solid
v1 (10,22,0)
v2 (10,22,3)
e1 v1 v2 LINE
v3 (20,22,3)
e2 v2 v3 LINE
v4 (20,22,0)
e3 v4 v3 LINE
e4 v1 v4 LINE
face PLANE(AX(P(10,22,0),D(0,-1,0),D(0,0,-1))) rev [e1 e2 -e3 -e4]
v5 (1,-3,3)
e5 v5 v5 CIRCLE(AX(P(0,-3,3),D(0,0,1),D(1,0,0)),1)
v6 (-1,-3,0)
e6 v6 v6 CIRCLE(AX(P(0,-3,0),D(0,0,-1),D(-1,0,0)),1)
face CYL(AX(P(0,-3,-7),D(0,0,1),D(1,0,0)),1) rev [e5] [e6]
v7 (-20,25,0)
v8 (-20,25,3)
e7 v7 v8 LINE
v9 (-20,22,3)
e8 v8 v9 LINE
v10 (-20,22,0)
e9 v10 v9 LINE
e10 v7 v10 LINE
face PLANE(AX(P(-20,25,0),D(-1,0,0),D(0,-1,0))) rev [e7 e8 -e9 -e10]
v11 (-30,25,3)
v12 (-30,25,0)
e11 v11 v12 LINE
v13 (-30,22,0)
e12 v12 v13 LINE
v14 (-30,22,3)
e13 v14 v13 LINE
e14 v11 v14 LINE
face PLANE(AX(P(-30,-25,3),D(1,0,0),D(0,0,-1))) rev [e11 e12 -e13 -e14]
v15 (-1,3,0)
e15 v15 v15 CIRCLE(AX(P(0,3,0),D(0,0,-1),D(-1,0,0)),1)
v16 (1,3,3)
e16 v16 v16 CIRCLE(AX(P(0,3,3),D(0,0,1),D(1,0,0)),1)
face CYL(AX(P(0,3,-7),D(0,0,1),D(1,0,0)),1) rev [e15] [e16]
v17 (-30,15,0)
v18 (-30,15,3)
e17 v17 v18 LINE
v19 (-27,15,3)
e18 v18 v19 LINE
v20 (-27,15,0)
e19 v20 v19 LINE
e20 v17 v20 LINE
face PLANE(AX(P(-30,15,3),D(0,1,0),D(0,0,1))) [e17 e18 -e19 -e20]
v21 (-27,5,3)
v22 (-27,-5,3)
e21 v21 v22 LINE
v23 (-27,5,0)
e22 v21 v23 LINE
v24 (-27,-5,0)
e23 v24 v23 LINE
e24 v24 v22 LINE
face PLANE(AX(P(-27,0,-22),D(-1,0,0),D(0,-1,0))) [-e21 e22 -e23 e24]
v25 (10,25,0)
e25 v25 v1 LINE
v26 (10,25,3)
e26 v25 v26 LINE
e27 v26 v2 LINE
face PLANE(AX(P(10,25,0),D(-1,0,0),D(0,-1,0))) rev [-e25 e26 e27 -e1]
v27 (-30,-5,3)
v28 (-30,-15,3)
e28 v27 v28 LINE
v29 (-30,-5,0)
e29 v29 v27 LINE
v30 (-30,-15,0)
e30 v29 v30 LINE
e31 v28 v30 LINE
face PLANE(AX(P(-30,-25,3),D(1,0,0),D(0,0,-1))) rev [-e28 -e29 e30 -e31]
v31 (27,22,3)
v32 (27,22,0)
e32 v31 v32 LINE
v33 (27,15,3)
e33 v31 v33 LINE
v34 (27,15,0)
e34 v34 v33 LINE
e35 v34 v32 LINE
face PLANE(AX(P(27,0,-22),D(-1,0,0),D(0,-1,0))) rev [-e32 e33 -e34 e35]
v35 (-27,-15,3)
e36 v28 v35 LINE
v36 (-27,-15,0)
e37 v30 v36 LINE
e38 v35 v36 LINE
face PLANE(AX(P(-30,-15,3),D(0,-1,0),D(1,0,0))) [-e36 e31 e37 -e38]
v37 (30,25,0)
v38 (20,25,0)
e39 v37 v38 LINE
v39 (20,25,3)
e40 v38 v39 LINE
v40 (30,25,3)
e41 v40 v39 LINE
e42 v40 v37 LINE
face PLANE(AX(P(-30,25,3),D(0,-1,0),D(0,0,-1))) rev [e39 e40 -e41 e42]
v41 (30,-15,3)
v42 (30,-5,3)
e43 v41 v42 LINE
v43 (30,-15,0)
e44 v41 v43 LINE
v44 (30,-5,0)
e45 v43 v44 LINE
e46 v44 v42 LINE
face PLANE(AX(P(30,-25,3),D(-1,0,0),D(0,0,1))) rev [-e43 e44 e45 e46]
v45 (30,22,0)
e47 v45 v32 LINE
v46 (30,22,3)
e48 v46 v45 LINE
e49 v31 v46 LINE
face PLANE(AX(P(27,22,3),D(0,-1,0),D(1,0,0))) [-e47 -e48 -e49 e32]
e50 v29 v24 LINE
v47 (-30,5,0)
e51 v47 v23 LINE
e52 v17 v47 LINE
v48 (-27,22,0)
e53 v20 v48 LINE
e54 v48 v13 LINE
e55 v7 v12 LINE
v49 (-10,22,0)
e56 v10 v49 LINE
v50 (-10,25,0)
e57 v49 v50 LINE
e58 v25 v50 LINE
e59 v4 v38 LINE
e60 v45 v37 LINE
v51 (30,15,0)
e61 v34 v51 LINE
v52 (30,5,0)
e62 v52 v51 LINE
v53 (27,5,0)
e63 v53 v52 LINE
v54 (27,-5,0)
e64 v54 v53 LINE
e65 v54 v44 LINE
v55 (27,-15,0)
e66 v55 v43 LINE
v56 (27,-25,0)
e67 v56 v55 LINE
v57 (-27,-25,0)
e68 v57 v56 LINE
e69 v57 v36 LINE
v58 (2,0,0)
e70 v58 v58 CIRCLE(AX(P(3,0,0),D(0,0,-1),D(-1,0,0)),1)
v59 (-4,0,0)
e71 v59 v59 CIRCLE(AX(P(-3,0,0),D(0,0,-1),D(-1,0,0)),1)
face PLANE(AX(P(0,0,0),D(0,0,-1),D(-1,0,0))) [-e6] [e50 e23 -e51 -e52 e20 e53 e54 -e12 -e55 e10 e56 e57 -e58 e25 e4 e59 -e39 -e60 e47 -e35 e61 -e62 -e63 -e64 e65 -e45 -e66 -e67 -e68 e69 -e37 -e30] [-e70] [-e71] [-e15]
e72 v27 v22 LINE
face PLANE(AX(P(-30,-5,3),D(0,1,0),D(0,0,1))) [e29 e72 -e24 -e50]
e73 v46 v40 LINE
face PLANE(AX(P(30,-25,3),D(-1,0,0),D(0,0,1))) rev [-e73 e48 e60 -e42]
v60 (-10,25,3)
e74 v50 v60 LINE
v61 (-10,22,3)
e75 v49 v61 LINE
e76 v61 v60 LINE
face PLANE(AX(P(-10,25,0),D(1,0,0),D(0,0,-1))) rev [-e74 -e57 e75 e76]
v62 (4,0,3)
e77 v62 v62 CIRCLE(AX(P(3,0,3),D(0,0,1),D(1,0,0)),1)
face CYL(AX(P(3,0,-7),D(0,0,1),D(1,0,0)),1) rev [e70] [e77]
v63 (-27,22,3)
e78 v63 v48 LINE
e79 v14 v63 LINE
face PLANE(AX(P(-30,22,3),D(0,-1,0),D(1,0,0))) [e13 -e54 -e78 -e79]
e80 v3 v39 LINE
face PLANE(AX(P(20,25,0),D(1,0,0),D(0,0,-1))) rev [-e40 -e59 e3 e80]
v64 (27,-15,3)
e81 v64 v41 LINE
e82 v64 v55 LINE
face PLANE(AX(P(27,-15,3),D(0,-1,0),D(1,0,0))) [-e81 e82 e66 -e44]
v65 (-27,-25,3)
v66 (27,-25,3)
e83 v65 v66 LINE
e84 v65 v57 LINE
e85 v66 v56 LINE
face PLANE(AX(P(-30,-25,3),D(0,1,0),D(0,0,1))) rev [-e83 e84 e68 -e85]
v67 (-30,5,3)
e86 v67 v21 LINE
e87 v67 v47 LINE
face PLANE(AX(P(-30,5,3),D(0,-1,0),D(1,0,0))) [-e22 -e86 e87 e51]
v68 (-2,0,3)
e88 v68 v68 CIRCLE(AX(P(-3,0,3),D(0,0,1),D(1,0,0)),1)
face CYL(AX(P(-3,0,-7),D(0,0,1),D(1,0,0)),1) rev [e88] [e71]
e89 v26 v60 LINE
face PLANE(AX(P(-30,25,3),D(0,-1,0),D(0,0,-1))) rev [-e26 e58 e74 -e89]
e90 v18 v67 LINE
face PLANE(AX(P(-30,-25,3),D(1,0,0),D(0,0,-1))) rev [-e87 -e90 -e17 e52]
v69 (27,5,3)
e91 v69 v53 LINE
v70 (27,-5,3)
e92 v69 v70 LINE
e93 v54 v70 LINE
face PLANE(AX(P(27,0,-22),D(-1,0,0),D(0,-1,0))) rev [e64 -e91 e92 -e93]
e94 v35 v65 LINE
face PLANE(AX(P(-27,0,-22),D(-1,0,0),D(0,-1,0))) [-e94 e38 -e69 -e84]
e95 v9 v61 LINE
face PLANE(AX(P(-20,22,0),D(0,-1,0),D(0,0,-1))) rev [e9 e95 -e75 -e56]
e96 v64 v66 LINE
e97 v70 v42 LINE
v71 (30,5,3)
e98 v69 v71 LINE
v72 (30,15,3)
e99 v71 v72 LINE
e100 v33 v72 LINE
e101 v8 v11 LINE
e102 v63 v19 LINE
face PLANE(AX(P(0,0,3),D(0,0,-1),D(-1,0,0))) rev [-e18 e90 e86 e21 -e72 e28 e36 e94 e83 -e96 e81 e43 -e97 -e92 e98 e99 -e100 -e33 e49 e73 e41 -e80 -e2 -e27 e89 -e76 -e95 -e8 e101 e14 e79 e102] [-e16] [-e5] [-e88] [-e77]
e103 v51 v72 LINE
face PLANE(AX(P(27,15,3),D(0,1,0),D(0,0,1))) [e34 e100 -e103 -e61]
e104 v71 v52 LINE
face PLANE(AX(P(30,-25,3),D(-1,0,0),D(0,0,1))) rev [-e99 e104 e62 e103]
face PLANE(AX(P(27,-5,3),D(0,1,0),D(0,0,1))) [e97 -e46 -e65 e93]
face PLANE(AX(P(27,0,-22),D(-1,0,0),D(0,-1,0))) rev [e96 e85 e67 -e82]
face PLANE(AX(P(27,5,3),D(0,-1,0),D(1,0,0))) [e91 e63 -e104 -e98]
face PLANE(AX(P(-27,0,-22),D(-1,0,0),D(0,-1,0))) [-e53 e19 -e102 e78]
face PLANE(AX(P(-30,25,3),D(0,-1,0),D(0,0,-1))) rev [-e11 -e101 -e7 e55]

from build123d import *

# Parameters (mm, degrees)
SKETCH1_W           = 60
SKETCH1_H           = 50
BOSS_EXTRUDE1_DEPTH = 3
SKETCH2_W           = 10
SKETCH2_H           = 3
CUT_EXTRUDE1_DEPTH  = 3
SKETCH3_R           = 1
CUT_EXTRUDE2_DEPTH  = 10
CAVITY3_START       = -25
CAVITY3_OUTLINE_W   = 3
CAVITY3_OUTLINE_H   = 3
CAVITY3_DEPTH       = 10
CAVITY3_START_2     = -5
CAVITY3_2_OUTLINE_W = 3
CAVITY3_2_OUTLINE_H = 3
CAVITY3_2_DEPTH     = 10
CAVITY3_START_3     = 15
CAVITY3_3_OUTLINE_W = 3
CAVITY3_3_OUTLINE_H = 3
CAVITY3_3_DEPTH     = 7


# Read off the part's stored shape, not the designer's step: Cavity3
with BuildPart() as part:
    # Sketch1 → Boss-Extrude1 (new body)
    with BuildSketch(Plane.XY):
        Rectangle(SKETCH1_W, SKETCH1_H)
    extrude(amount=BOSS_EXTRUDE1_DEPTH)

    # Sketch2 → Cut-Extrude1 (cut)
    with BuildSketch(Plane.XY.offset(3)):
        with Locations((-15, 23.5)):
            Rectangle(SKETCH2_W, SKETCH2_H)
        with Locations((15, 23.5)):
            Rectangle(SKETCH2_W, SKETCH2_H)
    extrude(amount=-CUT_EXTRUDE1_DEPTH, mode=Mode.SUBTRACT)

    # Sketch3 → Cut-Extrude2 (cut)
    with BuildSketch(Plane.XY.offset(3)):
        with Locations((0, 3)):
            Circle(SKETCH3_R)
        with Locations((3, 0)):
            Circle(SKETCH3_R)
        with Locations((0, -3)):
            Circle(SKETCH3_R)
        with Locations((-3, 0)):
            Circle(SKETCH3_R)
    extrude(amount=-CUT_EXTRUDE2_DEPTH, mode=Mode.SUBTRACT)

    # Cavity3 outline → Cavity3 (cut)
    with BuildSketch(Plane(origin=(0, 0, 0), x_dir=(1, 0, 0), z_dir=(0, 1, 0)).offset(CAVITY3_START)):
        with Locations((28.5, -1.5)):
            Rectangle(CAVITY3_OUTLINE_W, CAVITY3_OUTLINE_H)
        with Locations((-28.5, -1.5)):
            Rectangle(CAVITY3_OUTLINE_W, CAVITY3_OUTLINE_H)
    extrude(amount=CAVITY3_DEPTH, mode=Mode.SUBTRACT)

    # Cavity3 2 outline → Cavity3 2 (cut)
    with BuildSketch(Plane(origin=(0, 0, 0), x_dir=(1, 0, 0), z_dir=(0, 1, 0)).offset(CAVITY3_START_2)):
        with Locations((28.5, -1.5)):
            Rectangle(CAVITY3_2_OUTLINE_W, CAVITY3_2_OUTLINE_H)
        with Locations((-28.5, -1.5)):
            Rectangle(CAVITY3_2_OUTLINE_W, CAVITY3_2_OUTLINE_H)
    extrude(amount=CAVITY3_2_DEPTH, mode=Mode.SUBTRACT)

    # Cavity3 3 outline → Cavity3 3 (cut)
    with BuildSketch(Plane(origin=(0, 0, 0), x_dir=(1, 0, 0), z_dir=(0, 1, 0)).offset(CAVITY3_START_3)):
        with Locations((28.5, -1.5)):
            Rectangle(CAVITY3_3_OUTLINE_W, CAVITY3_3_OUTLINE_H)
        with Locations((-28.5, -1.5)):
            Rectangle(CAVITY3_3_OUTLINE_W, CAVITY3_3_OUTLINE_H)
    extrude(amount=CAVITY3_3_DEPTH, mode=Mode.SUBTRACT)


solid = part.part
